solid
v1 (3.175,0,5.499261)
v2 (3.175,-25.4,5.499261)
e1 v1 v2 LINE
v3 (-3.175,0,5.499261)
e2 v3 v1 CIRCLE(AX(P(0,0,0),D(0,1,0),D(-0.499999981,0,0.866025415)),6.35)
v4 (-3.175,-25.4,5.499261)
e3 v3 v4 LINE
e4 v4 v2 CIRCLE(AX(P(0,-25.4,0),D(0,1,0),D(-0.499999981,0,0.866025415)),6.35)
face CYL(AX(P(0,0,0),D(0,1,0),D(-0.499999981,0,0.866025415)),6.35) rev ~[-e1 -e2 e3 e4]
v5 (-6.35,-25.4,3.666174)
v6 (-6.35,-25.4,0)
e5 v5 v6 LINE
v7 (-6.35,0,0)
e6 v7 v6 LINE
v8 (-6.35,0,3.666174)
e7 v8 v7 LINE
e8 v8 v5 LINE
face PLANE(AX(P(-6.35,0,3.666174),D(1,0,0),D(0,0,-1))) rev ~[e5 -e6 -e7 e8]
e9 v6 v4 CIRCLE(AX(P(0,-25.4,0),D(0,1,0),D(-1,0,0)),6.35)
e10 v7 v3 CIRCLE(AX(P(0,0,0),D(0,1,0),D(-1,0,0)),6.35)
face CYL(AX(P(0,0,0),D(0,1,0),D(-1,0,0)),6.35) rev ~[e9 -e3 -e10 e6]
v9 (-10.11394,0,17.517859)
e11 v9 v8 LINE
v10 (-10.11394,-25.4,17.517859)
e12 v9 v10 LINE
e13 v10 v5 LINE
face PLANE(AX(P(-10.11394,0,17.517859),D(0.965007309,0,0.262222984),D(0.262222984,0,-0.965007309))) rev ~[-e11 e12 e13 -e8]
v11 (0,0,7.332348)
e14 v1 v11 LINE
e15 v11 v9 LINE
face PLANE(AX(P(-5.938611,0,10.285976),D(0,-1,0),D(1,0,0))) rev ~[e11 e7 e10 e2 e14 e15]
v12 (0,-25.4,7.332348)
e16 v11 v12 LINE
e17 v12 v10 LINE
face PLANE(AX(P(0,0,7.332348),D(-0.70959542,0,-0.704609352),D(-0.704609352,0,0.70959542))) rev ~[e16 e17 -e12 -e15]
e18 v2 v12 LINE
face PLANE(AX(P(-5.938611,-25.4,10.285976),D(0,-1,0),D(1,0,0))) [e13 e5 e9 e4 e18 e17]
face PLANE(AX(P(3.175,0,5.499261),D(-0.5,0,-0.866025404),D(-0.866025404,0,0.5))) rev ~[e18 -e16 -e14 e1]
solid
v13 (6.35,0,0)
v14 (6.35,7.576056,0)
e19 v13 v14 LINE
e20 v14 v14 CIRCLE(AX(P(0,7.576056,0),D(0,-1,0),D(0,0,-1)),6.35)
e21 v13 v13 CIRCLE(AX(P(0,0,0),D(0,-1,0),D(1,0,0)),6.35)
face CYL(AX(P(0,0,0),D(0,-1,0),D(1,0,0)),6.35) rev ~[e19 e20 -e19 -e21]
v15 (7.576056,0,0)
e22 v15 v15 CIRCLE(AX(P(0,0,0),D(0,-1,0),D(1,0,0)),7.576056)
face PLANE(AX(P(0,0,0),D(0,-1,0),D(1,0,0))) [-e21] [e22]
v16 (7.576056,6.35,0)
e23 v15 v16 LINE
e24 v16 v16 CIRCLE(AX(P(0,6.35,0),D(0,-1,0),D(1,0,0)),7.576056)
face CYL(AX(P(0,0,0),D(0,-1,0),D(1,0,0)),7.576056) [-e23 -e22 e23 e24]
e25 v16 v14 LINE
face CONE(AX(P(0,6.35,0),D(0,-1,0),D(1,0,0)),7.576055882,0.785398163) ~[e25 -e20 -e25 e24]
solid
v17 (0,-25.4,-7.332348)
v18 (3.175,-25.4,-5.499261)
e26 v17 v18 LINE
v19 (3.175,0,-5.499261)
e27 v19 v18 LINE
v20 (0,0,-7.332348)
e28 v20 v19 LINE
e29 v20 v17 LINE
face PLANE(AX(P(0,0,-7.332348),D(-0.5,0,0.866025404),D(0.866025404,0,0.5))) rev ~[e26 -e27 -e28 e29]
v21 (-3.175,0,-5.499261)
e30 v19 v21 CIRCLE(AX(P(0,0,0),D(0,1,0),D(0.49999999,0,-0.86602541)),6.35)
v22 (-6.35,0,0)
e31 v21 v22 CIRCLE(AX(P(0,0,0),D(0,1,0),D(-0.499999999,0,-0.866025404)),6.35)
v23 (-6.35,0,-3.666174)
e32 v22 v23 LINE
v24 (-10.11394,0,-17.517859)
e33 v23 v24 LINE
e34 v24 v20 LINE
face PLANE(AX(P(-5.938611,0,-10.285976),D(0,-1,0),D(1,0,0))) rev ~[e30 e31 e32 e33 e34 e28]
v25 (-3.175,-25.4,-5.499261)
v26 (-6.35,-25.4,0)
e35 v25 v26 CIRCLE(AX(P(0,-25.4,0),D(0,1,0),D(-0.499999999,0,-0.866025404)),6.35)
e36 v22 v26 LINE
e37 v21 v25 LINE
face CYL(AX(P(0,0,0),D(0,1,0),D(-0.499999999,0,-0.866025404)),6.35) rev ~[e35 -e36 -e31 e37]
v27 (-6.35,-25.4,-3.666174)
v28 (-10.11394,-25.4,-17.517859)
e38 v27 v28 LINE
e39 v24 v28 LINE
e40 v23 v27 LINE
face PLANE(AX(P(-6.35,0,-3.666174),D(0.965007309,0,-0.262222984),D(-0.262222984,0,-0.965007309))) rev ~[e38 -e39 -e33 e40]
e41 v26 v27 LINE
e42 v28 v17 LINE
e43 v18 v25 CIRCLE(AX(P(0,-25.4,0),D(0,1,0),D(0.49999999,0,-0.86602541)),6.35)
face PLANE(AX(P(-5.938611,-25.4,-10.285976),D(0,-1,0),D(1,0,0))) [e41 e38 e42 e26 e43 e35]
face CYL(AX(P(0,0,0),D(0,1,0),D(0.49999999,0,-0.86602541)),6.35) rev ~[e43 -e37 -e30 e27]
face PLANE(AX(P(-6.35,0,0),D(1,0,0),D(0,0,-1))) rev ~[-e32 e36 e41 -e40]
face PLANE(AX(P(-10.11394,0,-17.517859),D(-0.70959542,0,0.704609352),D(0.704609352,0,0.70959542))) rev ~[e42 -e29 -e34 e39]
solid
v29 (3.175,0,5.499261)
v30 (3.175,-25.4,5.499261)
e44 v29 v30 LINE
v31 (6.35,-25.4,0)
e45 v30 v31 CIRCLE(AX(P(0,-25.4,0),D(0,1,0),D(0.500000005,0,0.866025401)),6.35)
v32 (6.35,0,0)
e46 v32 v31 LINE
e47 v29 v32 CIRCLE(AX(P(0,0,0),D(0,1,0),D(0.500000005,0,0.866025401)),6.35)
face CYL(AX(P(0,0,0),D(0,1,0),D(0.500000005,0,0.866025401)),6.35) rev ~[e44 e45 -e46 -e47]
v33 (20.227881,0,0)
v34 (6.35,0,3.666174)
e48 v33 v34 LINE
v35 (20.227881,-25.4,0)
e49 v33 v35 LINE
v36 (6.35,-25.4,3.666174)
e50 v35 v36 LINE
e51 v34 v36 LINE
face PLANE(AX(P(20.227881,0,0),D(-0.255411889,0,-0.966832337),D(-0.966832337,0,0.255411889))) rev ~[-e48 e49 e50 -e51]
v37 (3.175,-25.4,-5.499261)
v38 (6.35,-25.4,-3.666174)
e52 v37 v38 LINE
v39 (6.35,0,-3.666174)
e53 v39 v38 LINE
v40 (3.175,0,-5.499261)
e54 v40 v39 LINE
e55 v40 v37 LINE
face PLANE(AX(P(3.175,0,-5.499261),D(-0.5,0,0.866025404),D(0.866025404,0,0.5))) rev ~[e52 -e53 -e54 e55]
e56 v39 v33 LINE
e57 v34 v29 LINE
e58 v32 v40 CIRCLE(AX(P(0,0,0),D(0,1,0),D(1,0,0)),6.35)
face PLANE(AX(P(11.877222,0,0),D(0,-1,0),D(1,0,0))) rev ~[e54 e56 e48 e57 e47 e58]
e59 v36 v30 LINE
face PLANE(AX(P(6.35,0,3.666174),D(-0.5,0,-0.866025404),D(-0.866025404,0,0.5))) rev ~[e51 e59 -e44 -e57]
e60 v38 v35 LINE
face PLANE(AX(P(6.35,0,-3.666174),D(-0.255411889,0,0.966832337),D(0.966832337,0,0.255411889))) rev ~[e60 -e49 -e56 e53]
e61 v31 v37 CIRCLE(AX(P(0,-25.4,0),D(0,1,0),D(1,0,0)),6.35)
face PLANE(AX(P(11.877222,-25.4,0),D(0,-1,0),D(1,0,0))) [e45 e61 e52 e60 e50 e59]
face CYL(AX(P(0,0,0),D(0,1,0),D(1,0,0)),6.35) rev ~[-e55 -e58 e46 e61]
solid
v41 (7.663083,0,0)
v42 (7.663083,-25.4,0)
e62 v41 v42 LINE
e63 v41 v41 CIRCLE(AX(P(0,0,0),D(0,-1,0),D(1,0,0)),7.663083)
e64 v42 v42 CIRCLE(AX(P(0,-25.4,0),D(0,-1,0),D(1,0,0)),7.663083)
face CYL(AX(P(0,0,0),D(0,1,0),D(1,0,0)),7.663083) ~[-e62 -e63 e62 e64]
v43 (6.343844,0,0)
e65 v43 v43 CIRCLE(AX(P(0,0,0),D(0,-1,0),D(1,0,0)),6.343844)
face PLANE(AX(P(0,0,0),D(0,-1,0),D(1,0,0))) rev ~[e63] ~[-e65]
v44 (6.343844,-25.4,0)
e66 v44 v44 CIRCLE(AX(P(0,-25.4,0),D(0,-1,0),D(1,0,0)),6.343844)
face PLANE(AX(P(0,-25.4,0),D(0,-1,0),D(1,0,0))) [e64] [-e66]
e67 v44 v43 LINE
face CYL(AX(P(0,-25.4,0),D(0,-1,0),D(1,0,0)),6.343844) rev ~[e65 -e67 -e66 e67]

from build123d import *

# Parameters (mm, degrees)
F1_DEPTH = 25.4
F2_R     = 7.6630831302
F3_DEPTH = 25.4
F4_R     = 7.5760558817
F4_R_2   = 6.35
F5_DEPTH = 8.89
F7_R     = 6.3438436569
F8_DEPTH = 32.9770558817


# Not quite as in the source:
# - a fillet or chamfer that OpenCascade refuses, or shapes differently, is made with other operations: its cross-section is extruded or revolved along the edge and cut away or added


with BuildPart() as f1:
    # F0 (on Front) → F1 (new body)
    with BuildSketch(Plane.XZ):
        Polygon((-6.35, 3.6661742094), (-3.1749998817, 5.4992613823), (0, 7.3323484187), (-10.1139404636, 17.5178587477), align=None)
        with BuildLine():
            ThreePointArc((-6.35, 0), (-5.4992612799, 3.1750000591), (-3.1749998817, 5.4992613823))
            Line((-3.1749998817, 5.4992613823), (-6.35, 3.6661742094))
            Line((-6.35, 3.6661742094), (-6.35, 0))
        make_face()
        with BuildLine():
            ThreePointArc((-3.1749998817, 5.4992613823), (8.7e-08, 6.35), (3.1750000324, 5.4992612953))
            Line((3.1750000324, 5.4992612953), (0, 7.3323484187))
            Line((0, 7.3323484187), (-3.1749998817, 5.4992613823))
        make_face()
    extrude(amount=F1_DEPTH)


with BuildPart() as f1b:
    # F0 (on Front) → F1, piece 2 (new body)
    with BuildSketch(Plane.XZ):
        Polygon((6.35, 3.6661742094), (6.35, 0), (6.35, -3.6661742094), (20.2278809273, 0), align=None)
        with BuildLine():
            ThreePointArc((3.1750000324, 5.4992612953), (5.4992613234, 3.1749999838), (6.35, 0))
            Line((6.35, 0), (6.35, 3.6661742094))
            Line((6.35, 3.6661742094), (3.1750000324, 5.4992612953))
        make_face()
        with BuildLine():
            Line((6.35, -3.6661742094), (6.35, 0))
            ThreePointArc((6.35, 0), (5.4992612955, -3.175000032), (3.174999936, -5.499261351))
            Line((3.174999936, -5.499261351), (6.35, -3.6661742094))
        make_face()
    extrude(amount=F1_DEPTH)


with BuildPart() as f1c:
    # F0 (on Front) → F1, piece 3 (new body)
    with BuildSketch(Plane.XZ):
        Polygon((0, -7.3323484187), (-3.1749999956, -5.4992613166), (-6.35, -3.6661742094), (-10.1139404636, -17.5178587477), align=None)
        with BuildLine():
            Line((-6.35, -3.6661742094), (-3.1749999956, -5.4992613166))
            ThreePointArc((-3.1749999956, -5.4992613166), (-5.4992613128, -3.1750000022), (-6.35, 0))
            Line((-6.35, 0), (-6.35, -3.6661742094))
        make_face()
        with BuildLine():
            Line((0, -7.3323484187), (3.174999936, -5.499261351))
            ThreePointArc((3.174999936, -5.499261351), (-3.44e-08, -6.35), (-3.1749999956, -5.4992613166))
            Line((-3.1749999956, -5.4992613166), (0, -7.3323484187))
        make_face()
    extrude(amount=F1_DEPTH)


with BuildPart() as f3:
    # F2 (on Front) → F3 (new body)
    with BuildSketch(Plane.XZ):
        Circle(F2_R)
    extrude(amount=F3_DEPTH)

    # F7 (on face) → F8 (cut, through all)
    with BuildSketch(Plane.XZ.offset(25.4)):
        Circle(F7_R)
    extrude(amount=-F8_DEPTH, mode=Mode.SUBTRACT)


with BuildPart() as f5:
    # F4 (on Front) → F5 (new body)
    with BuildSketch(Plane.XZ):
        Circle(F4_R)
        Circle(F4_R_2, mode=Mode.SUBTRACT)
    extrude(amount=-F5_DEPTH)

    # F6: chamfer of 2.54 on 1 edges, made by hand

    # F6_s1 → F6_t2 (revolve, cut)
    with BuildSketch(Plane.XY):
        Polygon((7.5760558817, 6.35), (5.0360558817, 8.89), (7.5760558817, 8.89), align=None)
    revolve(axis=Axis((0, 8.89, 0), (0, -1, 0)), mode=Mode.SUBTRACT)


solid = Compound([f1.part, f1b.part, f1c.part, f3.part, f5.part])
